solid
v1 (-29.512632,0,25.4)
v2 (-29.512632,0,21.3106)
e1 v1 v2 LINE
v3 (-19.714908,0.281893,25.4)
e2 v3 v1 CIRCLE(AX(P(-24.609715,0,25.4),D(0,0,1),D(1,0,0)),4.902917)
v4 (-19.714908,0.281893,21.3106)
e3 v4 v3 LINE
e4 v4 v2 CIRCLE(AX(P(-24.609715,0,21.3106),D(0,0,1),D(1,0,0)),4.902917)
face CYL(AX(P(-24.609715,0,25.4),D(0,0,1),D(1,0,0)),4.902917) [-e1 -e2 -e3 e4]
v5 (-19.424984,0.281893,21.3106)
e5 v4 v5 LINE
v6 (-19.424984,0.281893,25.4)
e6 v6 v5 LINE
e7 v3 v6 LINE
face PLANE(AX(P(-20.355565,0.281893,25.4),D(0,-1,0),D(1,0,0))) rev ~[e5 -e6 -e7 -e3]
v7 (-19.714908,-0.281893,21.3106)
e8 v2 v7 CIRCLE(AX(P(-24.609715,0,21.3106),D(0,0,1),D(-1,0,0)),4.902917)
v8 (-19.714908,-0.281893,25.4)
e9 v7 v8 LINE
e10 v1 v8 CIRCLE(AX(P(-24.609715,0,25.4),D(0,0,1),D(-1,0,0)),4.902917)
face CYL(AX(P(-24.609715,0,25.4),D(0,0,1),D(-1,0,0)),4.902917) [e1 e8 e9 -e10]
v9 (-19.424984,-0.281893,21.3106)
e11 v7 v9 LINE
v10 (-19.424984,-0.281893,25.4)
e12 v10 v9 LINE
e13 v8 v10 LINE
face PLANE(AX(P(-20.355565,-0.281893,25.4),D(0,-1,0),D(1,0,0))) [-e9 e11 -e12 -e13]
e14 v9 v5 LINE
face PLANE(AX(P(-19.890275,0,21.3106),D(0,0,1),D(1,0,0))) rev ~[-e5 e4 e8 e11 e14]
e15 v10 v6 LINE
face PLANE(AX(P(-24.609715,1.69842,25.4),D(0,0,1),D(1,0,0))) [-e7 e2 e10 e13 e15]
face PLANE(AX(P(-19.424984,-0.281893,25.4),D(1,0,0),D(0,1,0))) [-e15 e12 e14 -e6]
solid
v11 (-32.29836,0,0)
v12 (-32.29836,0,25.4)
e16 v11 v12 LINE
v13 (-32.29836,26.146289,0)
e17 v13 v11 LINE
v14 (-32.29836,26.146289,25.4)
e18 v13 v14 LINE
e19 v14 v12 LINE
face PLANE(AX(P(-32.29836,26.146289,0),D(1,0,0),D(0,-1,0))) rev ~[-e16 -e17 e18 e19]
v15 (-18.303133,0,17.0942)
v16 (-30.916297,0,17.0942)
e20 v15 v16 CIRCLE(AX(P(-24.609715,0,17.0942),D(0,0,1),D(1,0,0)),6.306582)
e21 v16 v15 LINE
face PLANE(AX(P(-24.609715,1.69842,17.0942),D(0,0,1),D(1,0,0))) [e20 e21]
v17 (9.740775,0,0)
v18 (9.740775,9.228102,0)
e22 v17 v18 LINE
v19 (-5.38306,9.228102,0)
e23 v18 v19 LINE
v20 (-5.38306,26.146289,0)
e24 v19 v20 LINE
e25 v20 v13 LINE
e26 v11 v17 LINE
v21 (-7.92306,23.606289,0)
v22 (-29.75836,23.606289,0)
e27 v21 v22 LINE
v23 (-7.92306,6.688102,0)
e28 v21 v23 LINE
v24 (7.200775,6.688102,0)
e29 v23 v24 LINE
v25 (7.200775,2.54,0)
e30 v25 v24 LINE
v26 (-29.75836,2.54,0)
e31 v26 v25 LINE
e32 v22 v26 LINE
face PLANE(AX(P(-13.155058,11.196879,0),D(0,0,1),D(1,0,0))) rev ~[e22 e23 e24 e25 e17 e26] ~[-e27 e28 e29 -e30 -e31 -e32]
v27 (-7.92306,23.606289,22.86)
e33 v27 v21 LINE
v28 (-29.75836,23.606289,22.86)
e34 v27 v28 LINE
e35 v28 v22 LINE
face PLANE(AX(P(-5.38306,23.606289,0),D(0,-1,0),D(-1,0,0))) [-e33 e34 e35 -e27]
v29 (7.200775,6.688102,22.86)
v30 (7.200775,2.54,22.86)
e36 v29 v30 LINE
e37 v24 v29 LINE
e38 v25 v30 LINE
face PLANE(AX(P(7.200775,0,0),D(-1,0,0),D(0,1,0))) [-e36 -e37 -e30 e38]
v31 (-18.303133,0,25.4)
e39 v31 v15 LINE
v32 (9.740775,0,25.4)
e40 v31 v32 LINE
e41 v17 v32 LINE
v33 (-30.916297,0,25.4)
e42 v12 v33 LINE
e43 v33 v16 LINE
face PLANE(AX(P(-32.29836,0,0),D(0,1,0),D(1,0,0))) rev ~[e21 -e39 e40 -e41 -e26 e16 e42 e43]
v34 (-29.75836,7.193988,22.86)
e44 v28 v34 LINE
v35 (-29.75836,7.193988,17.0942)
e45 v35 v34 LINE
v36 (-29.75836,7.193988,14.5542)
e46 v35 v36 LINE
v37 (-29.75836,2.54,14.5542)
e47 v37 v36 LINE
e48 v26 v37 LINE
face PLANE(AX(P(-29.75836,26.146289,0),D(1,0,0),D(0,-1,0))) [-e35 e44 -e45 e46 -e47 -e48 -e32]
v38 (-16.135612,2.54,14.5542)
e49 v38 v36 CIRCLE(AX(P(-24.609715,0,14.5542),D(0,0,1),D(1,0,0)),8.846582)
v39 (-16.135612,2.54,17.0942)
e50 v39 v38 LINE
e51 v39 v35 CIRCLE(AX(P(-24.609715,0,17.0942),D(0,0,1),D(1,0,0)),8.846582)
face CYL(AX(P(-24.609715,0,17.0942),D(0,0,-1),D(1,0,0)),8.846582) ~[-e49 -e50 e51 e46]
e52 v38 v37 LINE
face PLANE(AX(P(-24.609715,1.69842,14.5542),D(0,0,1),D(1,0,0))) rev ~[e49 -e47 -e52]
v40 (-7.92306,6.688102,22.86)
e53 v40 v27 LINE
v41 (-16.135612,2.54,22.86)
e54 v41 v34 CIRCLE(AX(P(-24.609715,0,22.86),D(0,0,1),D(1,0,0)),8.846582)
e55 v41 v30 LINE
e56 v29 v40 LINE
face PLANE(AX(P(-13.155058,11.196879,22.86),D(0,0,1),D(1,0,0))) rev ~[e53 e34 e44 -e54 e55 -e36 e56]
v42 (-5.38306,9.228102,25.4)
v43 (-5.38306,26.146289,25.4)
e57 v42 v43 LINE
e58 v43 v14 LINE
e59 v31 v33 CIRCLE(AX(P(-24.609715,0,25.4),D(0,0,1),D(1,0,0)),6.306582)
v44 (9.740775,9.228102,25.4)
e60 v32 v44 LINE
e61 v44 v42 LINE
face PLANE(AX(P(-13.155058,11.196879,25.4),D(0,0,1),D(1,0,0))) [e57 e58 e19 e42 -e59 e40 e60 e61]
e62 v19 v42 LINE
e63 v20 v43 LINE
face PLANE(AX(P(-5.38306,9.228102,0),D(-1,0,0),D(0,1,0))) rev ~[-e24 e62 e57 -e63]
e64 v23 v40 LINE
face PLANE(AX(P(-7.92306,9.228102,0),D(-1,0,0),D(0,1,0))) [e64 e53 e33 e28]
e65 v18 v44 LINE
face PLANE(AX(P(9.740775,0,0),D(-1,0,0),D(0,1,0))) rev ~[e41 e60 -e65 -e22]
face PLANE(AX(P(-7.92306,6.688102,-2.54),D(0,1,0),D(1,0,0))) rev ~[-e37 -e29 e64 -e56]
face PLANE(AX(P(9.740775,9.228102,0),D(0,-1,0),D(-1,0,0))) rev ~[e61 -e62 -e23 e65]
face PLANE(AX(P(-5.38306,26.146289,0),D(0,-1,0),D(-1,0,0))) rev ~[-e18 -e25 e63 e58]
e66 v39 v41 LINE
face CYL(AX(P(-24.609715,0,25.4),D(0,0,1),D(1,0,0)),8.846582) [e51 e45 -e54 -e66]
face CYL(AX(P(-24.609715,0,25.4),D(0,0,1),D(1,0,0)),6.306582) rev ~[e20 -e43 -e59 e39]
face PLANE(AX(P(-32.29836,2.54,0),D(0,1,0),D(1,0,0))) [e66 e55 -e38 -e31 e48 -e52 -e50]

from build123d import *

# Parameters (mm, degrees)
F1_DEPTH    = 25.4
F3_DEPTH    = 8.3058
F4_DEPTH    = 4.0894
F5_W        = 0.9305812418
F5_H        = 0.5637853174
F6_DEPTH    = 4.0894
F7_T        = 2.54
F7_T3_DEPTH = 30.48
F7_T6_ANGLE = 180.000000001


# Not quite as in the source:
# - a shell that OpenCascade refuses in one call is made with other operations: the cavity is built on its own and cut out


with BuildPart() as f1:
    # F0 (on Top) → F1 (new body)
    with BuildSketch(Plane.XY):
        Polygon((-32.2983600199, 26.1462889612), (-32.2983600199, 0), (9.7407754511, 0), (9.7407754511, 9.2281019315), (-5.3830603138, 9.2281019315), (-5.3830603138, 26.1462889612), align=None)
    extrude(amount=F1_DEPTH)

    # F2 (on face) → F3 (cut)
    with BuildSketch(Plane.XY.offset(25.4)):
        with BuildLine():
            Line((-29.5126315491, 0), (-19.7067979438, 0))
            ThreePointArc((-19.7067979438, 0), (-24.6097147465, 4.9029168026), (-29.5126315491, 0))
        make_face()
        with BuildLine():
            Line((-19.7067979438, 0), (-18.3031327531, 0))
            ThreePointArc((-18.3031327531, 0), (-24.6097147465, 6.3065819933), (-30.9162967398, 0))
            Line((-30.9162967398, 0), (-29.5126315491, 0))
            ThreePointArc((-29.5126315491, 0), (-24.6097147465, 4.9029168026), (-19.7067979438, 0))
        make_face()
    extrude(amount=-F3_DEPTH, mode=Mode.SUBTRACT)

    # F7: shell of thickness 2.54, made by hand


with BuildPart() as f4:
    # F2 (on face) → F4 (new body)
    with BuildSketch(Plane.XY.offset(25.4)):
        with BuildLine():
            Line((-29.5126315491, 0), (-19.7067979438, 0))
            ThreePointArc((-19.7067979438, 0), (-24.6097147465, 4.9029168026), (-29.5126315491, 0))
        make_face()
        with BuildLine():
            ThreePointArc((-29.5126315491, 0), (-24.6097147465, -4.9029168026), (-19.7067979438, 0))
            Line((-19.7067979438, 0), (-29.5126315491, 0))
        make_face()
    extrude(amount=-F4_DEPTH)

    # F5 (on face) → F6 (join, through all)
    with BuildSketch(Plane.XY.offset(25.4)):
        with Locations((-19.8902748525, 0)):
            Rectangle(F5_W, F5_H)
    extrude(amount=-F6_DEPTH)


with BuildPart() as f7_core1:
    # F7_t2: copy of F1
    add(f1.part)

    # the walls: a layer under each face that stays
    f7_faces = [f7_core1.faces().sort_by_distance(p)[0] for p in [
        (-32.2983600199, 13.0731444806, 12.7),
        (-18.8407101668, 26.1462889612, 12.7),
        (-11.2787922844, 0, 12.7),
        (-11.2787922844, 13.0731444806, 25.4),
        (-5.3830603138, 17.6871954463, 12.7),
        (9.7407754511, 4.6140509658, 12.7),
        (-24.6097147465, 6.3065819933, 21.2471),
        (-24.6097147465, 3.1532909967, 17.0942),
        (2.1788575687, 9.2281019315, 12.7),
    ]]
    thicken(f7_faces, amount=-F7_T, mode=Mode.SUBTRACT)

    # F7_s4 → F7_t3 (cut)
    with BuildSketch(Plane.XY.offset(-2.54)):
        Polygon((-5.3576603138, 9.2535019315), (-7.9230603138, 9.2281019315), (-7.9230603138, 6.6881019315), (-5.3830603138, 6.6881019315), align=None)
    extrude(amount=F7_T3_DEPTH, mode=Mode.SUBTRACT)

    # F7_s5 → F7_t6 (revolve, cut)
    with BuildSketch(Plane.XZ):
        Polygon((-18.3285327531, 17.1196), (-15.7631327531, 17.0942), (-15.7631327531, 14.5542), (-18.3031327531, 14.5542), align=None)
    revolve(axis=Axis((-24.6097147465, 0, 17.0942), (0, 0, 1)), revolution_arc=F7_T6_ANGLE, mode=Mode.SUBTRACT)


with BuildPart() as f1_1:
    add(f1.part)

    # what is left inside the walls is the cavity
    f7_cavity = [f7_core1.part.solids().sort_by_distance(p)[0] for p in [
        (-11.278792, 2.5654, 15.24),
    ]]
    add(f7_cavity, mode=Mode.SUBTRACT)


solid = Compound([f4.part, f1_1.part])
